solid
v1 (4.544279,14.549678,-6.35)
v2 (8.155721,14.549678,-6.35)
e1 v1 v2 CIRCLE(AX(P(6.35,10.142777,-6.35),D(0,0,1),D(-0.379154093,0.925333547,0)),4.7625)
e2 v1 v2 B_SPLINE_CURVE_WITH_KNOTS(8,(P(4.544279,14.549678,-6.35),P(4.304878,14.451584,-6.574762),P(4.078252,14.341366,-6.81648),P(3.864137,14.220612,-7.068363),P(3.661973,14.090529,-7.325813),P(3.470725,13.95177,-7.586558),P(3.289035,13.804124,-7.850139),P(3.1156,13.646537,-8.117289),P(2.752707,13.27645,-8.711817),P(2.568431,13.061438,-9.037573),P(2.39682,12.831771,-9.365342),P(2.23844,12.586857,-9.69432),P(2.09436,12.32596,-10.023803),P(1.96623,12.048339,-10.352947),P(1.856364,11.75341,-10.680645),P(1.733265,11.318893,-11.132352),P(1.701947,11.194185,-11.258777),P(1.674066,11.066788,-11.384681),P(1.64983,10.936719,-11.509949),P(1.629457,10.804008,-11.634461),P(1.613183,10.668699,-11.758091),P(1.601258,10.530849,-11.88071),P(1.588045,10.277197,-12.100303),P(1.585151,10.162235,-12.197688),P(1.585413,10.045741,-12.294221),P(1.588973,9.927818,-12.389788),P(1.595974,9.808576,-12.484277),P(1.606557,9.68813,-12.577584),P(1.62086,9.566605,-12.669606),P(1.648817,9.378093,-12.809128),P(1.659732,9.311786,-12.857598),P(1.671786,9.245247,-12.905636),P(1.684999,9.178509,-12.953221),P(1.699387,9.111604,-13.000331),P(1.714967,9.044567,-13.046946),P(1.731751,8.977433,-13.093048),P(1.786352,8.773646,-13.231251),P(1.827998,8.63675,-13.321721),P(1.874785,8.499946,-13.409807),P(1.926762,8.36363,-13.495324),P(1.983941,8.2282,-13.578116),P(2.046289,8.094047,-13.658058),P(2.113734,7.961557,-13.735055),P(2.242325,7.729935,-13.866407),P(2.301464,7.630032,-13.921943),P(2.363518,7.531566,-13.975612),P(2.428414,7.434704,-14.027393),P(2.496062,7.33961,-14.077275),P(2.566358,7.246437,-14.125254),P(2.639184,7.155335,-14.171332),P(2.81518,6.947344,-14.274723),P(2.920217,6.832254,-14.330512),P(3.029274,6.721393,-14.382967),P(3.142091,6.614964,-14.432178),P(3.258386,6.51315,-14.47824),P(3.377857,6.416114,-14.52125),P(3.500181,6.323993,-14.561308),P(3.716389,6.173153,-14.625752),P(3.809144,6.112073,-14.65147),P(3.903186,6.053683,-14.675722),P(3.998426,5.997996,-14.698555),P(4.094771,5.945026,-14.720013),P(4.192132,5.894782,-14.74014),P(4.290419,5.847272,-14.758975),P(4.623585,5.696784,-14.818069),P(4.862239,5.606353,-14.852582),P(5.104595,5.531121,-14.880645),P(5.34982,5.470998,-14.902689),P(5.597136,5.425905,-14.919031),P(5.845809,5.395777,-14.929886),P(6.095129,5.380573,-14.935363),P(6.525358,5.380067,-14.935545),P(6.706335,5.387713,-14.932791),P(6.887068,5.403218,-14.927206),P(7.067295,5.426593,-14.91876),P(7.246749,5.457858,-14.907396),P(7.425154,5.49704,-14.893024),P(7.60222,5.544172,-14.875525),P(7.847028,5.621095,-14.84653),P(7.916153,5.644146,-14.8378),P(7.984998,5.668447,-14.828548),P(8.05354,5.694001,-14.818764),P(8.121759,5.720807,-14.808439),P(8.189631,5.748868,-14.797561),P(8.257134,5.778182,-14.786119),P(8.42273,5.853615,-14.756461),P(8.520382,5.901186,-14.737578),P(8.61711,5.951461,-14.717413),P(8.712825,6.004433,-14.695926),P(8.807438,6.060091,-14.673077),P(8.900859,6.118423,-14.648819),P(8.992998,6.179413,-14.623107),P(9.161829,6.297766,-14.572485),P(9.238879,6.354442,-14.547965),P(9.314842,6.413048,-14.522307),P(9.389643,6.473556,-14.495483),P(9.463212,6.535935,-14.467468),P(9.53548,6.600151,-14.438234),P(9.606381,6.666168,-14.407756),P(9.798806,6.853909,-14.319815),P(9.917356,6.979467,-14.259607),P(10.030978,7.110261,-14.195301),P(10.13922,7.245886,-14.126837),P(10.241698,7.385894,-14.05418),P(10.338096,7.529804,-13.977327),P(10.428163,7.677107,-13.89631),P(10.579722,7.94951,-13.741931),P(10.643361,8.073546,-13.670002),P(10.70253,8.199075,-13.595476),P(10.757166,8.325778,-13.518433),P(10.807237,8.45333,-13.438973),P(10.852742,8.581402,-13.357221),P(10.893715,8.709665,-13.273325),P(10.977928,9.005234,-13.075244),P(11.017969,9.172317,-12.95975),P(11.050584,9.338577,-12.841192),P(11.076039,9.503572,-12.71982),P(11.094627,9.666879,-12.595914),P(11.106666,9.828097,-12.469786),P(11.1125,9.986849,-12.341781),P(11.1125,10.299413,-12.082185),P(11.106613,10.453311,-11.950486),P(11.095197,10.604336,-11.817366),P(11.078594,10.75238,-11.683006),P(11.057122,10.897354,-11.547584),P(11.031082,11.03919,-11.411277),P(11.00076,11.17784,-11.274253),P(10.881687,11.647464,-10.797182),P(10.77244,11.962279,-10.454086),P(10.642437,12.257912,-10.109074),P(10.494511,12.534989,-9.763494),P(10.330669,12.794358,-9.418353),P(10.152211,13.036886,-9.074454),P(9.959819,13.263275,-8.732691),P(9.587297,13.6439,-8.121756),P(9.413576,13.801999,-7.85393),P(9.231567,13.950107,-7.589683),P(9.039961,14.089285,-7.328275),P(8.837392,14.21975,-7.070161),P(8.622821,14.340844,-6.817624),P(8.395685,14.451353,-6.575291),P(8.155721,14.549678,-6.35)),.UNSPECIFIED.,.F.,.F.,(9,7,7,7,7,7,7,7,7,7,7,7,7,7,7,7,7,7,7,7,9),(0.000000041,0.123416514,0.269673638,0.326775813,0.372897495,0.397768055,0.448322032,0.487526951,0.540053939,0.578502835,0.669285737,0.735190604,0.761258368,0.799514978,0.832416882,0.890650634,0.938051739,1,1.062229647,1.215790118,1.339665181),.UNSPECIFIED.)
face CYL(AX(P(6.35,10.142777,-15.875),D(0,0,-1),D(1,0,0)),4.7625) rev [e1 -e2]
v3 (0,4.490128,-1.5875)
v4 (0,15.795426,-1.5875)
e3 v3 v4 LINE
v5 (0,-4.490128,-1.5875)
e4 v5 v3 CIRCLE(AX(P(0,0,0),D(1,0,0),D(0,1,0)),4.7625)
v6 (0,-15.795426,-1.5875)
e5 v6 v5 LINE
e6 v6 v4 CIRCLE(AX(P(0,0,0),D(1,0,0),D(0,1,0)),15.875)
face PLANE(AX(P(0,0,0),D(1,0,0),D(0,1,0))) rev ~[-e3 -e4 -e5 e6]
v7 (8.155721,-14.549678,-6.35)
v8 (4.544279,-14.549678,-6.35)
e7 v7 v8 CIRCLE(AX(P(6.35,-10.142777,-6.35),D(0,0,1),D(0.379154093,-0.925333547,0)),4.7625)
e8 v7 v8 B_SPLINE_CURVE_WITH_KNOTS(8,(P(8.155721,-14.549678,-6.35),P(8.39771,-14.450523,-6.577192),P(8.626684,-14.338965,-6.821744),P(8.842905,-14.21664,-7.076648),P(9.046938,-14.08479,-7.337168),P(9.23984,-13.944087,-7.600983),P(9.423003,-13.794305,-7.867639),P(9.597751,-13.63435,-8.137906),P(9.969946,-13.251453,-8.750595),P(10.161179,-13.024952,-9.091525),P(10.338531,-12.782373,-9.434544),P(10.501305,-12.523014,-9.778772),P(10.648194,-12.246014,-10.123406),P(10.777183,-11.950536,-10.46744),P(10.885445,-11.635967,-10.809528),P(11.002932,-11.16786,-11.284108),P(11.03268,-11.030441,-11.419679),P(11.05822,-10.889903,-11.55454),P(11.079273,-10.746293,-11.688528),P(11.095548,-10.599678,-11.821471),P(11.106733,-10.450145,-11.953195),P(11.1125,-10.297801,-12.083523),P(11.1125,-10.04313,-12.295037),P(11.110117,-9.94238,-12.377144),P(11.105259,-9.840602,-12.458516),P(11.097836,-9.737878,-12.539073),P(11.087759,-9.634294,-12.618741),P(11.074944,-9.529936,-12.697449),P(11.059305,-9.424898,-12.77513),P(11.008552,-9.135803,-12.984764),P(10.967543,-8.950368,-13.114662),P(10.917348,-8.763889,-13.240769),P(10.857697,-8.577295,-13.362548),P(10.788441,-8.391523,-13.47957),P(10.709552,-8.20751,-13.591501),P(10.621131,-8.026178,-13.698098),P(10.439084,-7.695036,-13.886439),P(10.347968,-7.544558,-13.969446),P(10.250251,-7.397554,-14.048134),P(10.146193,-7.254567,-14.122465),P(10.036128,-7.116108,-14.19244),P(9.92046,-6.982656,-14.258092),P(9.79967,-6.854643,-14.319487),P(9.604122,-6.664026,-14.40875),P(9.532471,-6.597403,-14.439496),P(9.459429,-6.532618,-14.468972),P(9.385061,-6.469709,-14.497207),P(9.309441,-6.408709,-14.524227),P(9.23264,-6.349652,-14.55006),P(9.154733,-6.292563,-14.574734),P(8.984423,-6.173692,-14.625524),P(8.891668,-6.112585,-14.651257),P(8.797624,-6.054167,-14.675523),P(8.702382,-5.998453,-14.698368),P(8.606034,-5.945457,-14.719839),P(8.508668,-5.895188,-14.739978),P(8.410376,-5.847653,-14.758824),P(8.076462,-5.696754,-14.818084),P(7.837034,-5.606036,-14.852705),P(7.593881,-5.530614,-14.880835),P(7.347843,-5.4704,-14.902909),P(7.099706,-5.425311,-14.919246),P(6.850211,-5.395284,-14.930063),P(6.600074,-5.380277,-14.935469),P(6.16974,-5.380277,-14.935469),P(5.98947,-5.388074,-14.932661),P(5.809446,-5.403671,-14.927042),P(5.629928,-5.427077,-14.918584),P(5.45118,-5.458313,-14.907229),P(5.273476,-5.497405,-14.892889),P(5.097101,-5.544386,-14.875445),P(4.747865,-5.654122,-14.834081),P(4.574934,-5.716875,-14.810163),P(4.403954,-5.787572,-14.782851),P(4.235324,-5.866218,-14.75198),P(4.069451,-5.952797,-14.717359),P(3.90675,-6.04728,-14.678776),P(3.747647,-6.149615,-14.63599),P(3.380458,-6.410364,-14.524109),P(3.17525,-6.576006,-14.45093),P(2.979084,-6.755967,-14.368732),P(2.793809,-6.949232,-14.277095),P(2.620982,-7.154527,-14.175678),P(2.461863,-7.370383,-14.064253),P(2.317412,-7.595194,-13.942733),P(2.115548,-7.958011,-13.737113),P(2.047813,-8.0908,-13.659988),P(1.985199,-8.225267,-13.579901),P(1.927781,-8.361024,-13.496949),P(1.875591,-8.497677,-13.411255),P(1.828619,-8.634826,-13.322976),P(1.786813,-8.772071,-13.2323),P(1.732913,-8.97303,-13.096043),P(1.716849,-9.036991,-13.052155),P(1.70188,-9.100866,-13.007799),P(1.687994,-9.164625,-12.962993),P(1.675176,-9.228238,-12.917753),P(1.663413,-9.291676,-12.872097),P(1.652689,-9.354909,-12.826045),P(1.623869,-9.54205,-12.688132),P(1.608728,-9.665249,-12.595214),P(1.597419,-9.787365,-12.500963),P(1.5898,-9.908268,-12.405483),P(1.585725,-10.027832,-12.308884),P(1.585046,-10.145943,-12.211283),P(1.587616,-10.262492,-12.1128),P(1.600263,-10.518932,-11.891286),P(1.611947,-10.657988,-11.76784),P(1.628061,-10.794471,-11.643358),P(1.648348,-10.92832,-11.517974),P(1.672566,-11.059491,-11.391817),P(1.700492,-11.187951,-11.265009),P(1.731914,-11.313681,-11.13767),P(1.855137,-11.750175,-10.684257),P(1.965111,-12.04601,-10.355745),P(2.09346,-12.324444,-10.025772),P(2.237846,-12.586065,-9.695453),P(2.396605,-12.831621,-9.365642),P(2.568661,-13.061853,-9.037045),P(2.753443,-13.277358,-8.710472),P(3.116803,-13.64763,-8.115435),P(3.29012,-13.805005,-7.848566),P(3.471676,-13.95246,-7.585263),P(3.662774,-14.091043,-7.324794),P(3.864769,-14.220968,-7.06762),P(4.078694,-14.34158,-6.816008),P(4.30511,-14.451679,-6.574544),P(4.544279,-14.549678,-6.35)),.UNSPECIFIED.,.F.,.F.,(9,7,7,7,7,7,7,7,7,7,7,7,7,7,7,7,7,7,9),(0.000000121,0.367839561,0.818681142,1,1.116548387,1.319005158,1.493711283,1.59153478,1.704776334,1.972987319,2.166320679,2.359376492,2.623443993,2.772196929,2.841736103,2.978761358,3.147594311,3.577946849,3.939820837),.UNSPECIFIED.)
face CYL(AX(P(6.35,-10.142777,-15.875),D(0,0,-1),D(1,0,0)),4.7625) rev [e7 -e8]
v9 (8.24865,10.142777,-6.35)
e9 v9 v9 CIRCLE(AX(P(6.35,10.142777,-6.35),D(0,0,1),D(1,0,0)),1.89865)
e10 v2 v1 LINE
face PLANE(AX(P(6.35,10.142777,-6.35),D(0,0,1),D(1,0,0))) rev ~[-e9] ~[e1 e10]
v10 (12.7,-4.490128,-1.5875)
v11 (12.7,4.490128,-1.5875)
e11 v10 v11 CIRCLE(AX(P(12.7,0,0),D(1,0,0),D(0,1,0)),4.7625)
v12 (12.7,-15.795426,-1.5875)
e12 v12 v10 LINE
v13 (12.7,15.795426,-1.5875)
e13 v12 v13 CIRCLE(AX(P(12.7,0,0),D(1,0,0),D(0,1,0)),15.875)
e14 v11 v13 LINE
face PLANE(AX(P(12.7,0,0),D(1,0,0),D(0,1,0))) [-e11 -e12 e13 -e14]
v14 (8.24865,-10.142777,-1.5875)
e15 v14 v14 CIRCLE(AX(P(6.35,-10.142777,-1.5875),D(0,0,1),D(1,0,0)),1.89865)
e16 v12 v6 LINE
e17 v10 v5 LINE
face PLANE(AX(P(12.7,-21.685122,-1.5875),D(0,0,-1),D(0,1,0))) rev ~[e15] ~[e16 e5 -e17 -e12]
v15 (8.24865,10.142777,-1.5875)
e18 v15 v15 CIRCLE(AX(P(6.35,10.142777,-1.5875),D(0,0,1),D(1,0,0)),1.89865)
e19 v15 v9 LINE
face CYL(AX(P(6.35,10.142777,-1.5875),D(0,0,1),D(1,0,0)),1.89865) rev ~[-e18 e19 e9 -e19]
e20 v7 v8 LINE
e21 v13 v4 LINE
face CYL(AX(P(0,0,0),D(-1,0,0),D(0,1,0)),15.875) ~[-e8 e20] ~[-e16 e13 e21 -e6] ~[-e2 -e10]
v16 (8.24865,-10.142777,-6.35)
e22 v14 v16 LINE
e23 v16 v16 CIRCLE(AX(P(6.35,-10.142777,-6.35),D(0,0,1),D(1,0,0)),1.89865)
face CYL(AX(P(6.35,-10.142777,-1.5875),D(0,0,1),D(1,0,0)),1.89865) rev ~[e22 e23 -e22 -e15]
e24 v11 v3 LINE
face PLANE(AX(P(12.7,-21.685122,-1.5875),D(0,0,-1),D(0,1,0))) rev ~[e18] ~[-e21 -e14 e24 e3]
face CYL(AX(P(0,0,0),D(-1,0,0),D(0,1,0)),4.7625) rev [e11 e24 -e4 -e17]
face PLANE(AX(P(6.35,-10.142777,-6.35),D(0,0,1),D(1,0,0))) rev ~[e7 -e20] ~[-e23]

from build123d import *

# Parameters (mm, degrees)
F0_R     = 15.875
F0_R_2   = 4.7625
F1_DEPTH = 12.7
F2_W     = 39.643920958
F2_H     = 19.4333904848
F3_DEPTH = 12.701
F4_R     = 1.89865
F5_DEPTH = 14.2885
F7_R     = 4.7625
F8_DEPTH = 9.525


# Not quite as in the source:
# - a length typed as a fraction of an inch, garbled in the dataset ("3 / 203.2 mm" for 3/8 in), is restored


with BuildPart() as f1:
    # F0 (on Right) → F1 (new body)
    with BuildSketch(Plane.YZ):
        Circle(F0_R)
        Circle(F0_R_2, mode=Mode.SUBTRACT)
    extrude(amount=F1_DEPTH)

    # F2 (on face) → F3 (cut, through all)
    with BuildSketch(Plane.YZ.offset(12.7)):
        with Locations((-1.8631611019, 8.1291952424)):
            Rectangle(F2_W, F2_H)
    extrude(amount=-F3_DEPTH, mode=Mode.SUBTRACT)

    # F4 (on face) → F5 (cut, through all)
    with BuildSketch(Plane.XY.offset(-1.5875)):
        with Locations((6.35, -10.1427768123)):
            Circle(F4_R)
        with Locations((6.35, 10.1427768123)):
            Circle(F4_R)
    extrude(amount=-F5_DEPTH, mode=Mode.SUBTRACT)

    # F7 (on offset) → F8 (cut)
    with BuildSketch(Plane.XY.offset(-15.875)):
        with Locations((6.35, 10.1427768123)):
            Circle(F7_R)
        with Locations((6.35, -10.1427768123)):
            Circle(F7_R)
    extrude(amount=F8_DEPTH, mode=Mode.SUBTRACT)


solid = f1.part
